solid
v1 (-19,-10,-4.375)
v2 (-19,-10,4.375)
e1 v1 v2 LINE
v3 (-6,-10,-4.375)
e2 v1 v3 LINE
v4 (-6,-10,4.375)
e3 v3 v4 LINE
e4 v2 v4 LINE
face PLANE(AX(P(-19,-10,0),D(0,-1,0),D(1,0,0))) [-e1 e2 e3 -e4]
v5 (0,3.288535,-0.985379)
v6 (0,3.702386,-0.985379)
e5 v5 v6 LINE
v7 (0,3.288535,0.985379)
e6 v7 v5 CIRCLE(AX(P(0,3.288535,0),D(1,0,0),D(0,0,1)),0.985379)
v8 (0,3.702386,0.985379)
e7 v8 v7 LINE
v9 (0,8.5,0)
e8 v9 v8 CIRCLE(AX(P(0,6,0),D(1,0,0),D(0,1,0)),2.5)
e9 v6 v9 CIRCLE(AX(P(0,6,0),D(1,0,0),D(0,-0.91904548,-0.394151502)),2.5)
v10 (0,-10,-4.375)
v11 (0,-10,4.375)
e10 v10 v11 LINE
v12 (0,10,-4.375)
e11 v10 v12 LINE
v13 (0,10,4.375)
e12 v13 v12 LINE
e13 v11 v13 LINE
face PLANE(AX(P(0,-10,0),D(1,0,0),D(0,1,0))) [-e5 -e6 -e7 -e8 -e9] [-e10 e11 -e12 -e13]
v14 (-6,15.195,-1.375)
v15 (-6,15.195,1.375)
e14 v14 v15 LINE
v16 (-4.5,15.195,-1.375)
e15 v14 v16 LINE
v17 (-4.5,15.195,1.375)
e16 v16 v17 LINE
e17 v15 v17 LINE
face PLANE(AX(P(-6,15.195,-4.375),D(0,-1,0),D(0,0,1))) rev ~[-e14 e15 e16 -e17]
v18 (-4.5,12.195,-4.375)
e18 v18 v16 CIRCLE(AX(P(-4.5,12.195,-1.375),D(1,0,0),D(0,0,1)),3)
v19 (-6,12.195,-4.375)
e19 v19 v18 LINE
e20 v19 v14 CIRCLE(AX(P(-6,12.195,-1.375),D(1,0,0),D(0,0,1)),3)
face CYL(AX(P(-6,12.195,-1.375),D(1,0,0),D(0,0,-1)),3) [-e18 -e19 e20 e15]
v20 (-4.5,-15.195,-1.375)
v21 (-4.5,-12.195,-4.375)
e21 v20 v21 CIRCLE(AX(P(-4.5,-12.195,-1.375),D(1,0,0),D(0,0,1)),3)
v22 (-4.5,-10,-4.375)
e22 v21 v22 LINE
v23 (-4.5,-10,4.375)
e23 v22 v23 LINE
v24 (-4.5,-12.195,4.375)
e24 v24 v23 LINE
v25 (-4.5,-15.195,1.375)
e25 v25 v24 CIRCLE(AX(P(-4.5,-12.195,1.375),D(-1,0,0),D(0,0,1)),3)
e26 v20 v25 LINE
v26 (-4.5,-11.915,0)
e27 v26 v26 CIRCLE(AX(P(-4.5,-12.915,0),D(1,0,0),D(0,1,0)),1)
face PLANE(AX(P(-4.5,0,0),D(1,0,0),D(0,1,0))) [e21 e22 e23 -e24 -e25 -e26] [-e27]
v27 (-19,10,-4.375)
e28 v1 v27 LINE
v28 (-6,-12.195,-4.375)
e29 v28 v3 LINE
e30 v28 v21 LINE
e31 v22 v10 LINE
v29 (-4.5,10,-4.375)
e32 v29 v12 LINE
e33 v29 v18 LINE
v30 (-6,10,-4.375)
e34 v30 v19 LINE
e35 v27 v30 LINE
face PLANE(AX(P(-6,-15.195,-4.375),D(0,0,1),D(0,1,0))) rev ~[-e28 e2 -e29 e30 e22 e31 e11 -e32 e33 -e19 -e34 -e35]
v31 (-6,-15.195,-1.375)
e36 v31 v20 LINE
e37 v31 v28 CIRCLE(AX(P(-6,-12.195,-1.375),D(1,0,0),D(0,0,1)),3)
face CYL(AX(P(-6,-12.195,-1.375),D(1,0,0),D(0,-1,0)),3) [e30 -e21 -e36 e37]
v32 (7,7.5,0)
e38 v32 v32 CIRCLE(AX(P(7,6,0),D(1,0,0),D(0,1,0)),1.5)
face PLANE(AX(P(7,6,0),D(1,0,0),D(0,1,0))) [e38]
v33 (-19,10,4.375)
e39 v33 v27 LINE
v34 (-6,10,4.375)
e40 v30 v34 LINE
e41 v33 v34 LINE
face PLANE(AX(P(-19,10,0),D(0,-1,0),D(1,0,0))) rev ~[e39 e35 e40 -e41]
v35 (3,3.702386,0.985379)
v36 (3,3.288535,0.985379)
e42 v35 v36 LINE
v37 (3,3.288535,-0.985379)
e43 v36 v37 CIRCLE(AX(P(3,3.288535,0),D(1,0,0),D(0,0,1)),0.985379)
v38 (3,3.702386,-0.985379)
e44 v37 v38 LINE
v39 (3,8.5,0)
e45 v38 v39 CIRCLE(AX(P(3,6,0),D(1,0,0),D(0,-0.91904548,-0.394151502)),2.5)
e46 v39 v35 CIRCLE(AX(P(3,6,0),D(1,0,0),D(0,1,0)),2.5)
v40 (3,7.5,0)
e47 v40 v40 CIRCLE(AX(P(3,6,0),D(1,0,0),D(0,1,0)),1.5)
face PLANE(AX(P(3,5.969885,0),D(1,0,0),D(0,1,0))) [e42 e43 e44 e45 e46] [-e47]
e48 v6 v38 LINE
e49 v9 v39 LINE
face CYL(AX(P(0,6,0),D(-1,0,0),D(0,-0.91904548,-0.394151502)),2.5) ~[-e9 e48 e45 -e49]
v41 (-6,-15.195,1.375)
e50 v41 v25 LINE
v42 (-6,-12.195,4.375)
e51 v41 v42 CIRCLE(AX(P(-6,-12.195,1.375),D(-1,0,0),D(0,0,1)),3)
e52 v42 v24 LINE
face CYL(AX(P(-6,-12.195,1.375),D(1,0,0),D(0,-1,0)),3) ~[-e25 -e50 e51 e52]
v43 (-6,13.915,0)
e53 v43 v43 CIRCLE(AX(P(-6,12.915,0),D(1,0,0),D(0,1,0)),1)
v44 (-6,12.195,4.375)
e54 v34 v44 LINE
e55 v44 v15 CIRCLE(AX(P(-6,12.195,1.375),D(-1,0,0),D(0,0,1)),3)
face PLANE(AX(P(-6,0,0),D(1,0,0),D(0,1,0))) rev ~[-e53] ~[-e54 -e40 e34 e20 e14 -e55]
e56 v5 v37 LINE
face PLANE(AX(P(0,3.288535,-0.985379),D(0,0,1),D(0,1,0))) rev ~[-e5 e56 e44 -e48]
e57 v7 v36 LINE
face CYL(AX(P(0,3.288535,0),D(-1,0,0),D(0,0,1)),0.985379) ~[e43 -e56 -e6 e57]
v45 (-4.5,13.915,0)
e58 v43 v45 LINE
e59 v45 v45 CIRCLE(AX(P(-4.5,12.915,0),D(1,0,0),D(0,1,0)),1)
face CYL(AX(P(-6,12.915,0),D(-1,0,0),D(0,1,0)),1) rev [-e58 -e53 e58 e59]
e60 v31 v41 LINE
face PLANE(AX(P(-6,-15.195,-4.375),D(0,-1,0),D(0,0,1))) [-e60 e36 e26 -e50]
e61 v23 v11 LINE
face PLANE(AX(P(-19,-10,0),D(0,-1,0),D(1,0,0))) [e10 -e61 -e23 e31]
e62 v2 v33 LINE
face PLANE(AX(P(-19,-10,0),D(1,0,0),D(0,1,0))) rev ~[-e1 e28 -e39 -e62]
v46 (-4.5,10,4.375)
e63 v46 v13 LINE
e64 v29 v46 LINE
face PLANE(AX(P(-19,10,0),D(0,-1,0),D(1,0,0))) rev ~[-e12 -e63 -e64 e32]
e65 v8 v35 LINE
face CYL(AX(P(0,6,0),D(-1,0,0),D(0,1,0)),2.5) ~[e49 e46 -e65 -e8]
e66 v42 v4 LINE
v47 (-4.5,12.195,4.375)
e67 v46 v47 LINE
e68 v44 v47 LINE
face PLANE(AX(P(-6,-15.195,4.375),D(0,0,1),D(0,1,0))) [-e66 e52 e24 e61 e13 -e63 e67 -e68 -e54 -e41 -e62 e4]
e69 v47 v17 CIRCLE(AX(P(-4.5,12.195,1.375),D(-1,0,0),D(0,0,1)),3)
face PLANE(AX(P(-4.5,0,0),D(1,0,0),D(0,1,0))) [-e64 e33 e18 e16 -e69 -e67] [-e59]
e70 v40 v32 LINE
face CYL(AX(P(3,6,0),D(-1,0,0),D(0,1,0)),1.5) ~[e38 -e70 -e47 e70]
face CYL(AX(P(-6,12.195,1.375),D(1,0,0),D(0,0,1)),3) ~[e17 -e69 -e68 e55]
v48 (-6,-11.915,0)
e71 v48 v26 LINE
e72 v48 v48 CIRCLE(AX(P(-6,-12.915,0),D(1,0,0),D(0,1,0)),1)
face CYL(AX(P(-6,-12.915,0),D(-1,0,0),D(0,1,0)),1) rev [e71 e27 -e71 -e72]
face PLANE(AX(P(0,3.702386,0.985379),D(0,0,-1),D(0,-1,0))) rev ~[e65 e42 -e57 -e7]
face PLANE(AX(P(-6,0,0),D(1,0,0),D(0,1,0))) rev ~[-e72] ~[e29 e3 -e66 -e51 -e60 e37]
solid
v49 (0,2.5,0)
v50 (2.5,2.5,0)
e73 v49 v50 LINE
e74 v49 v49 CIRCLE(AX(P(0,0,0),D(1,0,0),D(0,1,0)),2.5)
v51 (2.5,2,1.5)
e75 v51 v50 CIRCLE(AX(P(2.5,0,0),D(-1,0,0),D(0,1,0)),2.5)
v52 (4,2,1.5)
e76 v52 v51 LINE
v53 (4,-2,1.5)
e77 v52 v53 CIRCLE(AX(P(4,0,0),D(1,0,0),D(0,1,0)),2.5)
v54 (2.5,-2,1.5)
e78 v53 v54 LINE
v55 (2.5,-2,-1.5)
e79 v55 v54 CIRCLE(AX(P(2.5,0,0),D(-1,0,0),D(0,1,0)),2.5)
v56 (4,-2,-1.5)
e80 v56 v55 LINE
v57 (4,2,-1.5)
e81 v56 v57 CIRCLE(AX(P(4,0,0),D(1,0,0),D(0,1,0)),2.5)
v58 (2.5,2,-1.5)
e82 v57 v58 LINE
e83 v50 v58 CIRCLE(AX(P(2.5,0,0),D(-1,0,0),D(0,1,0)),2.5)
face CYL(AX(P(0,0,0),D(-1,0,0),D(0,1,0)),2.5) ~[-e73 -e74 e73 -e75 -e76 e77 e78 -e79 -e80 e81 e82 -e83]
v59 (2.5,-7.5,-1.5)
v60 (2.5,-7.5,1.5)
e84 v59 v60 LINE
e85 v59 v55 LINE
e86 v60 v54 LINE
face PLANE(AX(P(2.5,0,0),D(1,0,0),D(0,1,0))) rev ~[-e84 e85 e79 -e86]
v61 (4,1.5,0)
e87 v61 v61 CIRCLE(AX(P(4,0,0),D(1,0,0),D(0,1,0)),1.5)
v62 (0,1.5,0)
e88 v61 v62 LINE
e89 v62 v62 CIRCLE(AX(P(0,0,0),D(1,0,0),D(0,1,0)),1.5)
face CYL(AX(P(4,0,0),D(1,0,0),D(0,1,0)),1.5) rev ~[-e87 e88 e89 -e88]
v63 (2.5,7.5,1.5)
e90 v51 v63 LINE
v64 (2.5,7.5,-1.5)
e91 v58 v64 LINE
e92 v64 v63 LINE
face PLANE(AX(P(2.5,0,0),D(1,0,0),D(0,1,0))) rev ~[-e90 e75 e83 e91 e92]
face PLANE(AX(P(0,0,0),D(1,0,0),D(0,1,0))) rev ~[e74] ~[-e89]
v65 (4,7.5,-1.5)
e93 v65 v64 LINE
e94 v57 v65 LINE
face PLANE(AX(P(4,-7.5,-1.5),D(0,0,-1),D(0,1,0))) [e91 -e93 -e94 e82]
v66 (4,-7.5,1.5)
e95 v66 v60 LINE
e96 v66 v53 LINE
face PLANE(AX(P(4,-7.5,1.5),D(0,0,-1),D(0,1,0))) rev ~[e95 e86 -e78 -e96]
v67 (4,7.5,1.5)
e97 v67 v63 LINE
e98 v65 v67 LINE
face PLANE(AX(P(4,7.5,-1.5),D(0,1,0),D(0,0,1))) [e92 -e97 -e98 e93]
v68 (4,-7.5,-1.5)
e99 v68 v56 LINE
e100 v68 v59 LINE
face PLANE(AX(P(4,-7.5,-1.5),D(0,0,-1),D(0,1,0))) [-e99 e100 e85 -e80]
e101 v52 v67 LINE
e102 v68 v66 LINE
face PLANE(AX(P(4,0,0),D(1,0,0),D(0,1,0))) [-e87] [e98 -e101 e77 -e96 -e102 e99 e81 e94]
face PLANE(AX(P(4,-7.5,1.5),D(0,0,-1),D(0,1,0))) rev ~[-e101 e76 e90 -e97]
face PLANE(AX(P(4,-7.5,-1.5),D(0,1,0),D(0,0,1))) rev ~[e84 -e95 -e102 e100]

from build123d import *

# Parameters (mm, degrees)
F0_W      = 19
F0_H      = 20
F1_DEPTH  = 4.375
F3_W      = 30.39
F3_H      = 8.75
F3_R      = 1
F4_DEPTH  = 1.5
F6_DEPTH  = 3
F7_R      = 1.5
F8_DEPTH  = 4
F9_R      = 2.5
F10_DEPTH = 4
F12_W     = 15
F12_H     = 3
F13_DEPTH = 1.5
F11_R     = 1.5
F14_DEPTH = 25
F15_R     = 3


with BuildPart() as f1:
    # F0 (on Top) → F1 (new body, symmetric)
    with BuildSketch(Plane.XY):
        with Locations((-9.5, 0)):
            Rectangle(F0_W, F0_H)
    extrude(amount=F1_DEPTH, both=True)

    # F3 (on offset) → F4 (join)
    with BuildSketch(Plane.YZ.offset(-6)):
        Rectangle(F3_W, F3_H)
        with Locations((-12.915, 0)):
            Circle(F3_R, mode=Mode.SUBTRACT)
        with Locations((12.915, 0)):
            Circle(F3_R, mode=Mode.SUBTRACT)
    extrude(amount=F4_DEPTH)

    # F5 (on face) → F6 (join)
    with BuildSketch(Plane.YZ):
        with BuildLine():
            ThreePointArc((3.702386301, -0.9853787547), (6.5029740314, -2.44888079), (8.5, 0))
            ThreePointArc((8.5, 0), (6.5029740314, 2.44888079), (3.702386301, 0.9853787547))
            ThreePointArc((3.702386301, 0.9853787547), (3.5, 0), (3.702386301, -0.9853787547))
        make_face()
        with BuildLine():
            ThreePointArc((3.702386301, -0.9853787547), (3.5, 0), (3.702386301, 0.9853787547))
            Line((3.702386301, 0.9853787547), (3.2885346007, 0.9853787547))
            ThreePointArc((3.2885346007, 0.9853787547), (2.303155846, 0), (3.2885346007, -0.9853787547))
            Line((3.2885346007, -0.9853787547), (3.702386301, -0.9853787547))
        make_face()
    extrude(amount=F6_DEPTH)

    # F7 (on face) → F8 (join)
    with BuildSketch(Plane.YZ.offset(3)):
        with Locations((6, 0)):
            Circle(F7_R)
    extrude(amount=F8_DEPTH)

    # F15
    f15_edges = [f1.edges().sort_by_distance(p)[0] for p in [
        (-5.25, -15.195, -4.375),
        (-5.25, -15.195, 4.375),
        (-5.25, 15.195, -4.375),
        (-5.25, 15.195, 4.375),
    ]]
    fillet(f15_edges, radius=F15_R)


with BuildPart() as f10:
    # F9 (on Right) → F10 (new body)
    with BuildSketch(Plane.YZ):
        Circle(F9_R)
    extrude(amount=F10_DEPTH)

    # F12 (on face) → F13 (join)
    with BuildSketch(Plane.YZ.offset(4)):
        Rectangle(F12_W, F12_H)
    extrude(amount=-F13_DEPTH)

    # F11 (on face) → F14 (cut)
    with BuildSketch(Plane.YZ.offset(4)):
        Circle(F11_R)
    extrude(amount=-F14_DEPTH, mode=Mode.SUBTRACT)


solid = Compound([f1.part, f10.part])
